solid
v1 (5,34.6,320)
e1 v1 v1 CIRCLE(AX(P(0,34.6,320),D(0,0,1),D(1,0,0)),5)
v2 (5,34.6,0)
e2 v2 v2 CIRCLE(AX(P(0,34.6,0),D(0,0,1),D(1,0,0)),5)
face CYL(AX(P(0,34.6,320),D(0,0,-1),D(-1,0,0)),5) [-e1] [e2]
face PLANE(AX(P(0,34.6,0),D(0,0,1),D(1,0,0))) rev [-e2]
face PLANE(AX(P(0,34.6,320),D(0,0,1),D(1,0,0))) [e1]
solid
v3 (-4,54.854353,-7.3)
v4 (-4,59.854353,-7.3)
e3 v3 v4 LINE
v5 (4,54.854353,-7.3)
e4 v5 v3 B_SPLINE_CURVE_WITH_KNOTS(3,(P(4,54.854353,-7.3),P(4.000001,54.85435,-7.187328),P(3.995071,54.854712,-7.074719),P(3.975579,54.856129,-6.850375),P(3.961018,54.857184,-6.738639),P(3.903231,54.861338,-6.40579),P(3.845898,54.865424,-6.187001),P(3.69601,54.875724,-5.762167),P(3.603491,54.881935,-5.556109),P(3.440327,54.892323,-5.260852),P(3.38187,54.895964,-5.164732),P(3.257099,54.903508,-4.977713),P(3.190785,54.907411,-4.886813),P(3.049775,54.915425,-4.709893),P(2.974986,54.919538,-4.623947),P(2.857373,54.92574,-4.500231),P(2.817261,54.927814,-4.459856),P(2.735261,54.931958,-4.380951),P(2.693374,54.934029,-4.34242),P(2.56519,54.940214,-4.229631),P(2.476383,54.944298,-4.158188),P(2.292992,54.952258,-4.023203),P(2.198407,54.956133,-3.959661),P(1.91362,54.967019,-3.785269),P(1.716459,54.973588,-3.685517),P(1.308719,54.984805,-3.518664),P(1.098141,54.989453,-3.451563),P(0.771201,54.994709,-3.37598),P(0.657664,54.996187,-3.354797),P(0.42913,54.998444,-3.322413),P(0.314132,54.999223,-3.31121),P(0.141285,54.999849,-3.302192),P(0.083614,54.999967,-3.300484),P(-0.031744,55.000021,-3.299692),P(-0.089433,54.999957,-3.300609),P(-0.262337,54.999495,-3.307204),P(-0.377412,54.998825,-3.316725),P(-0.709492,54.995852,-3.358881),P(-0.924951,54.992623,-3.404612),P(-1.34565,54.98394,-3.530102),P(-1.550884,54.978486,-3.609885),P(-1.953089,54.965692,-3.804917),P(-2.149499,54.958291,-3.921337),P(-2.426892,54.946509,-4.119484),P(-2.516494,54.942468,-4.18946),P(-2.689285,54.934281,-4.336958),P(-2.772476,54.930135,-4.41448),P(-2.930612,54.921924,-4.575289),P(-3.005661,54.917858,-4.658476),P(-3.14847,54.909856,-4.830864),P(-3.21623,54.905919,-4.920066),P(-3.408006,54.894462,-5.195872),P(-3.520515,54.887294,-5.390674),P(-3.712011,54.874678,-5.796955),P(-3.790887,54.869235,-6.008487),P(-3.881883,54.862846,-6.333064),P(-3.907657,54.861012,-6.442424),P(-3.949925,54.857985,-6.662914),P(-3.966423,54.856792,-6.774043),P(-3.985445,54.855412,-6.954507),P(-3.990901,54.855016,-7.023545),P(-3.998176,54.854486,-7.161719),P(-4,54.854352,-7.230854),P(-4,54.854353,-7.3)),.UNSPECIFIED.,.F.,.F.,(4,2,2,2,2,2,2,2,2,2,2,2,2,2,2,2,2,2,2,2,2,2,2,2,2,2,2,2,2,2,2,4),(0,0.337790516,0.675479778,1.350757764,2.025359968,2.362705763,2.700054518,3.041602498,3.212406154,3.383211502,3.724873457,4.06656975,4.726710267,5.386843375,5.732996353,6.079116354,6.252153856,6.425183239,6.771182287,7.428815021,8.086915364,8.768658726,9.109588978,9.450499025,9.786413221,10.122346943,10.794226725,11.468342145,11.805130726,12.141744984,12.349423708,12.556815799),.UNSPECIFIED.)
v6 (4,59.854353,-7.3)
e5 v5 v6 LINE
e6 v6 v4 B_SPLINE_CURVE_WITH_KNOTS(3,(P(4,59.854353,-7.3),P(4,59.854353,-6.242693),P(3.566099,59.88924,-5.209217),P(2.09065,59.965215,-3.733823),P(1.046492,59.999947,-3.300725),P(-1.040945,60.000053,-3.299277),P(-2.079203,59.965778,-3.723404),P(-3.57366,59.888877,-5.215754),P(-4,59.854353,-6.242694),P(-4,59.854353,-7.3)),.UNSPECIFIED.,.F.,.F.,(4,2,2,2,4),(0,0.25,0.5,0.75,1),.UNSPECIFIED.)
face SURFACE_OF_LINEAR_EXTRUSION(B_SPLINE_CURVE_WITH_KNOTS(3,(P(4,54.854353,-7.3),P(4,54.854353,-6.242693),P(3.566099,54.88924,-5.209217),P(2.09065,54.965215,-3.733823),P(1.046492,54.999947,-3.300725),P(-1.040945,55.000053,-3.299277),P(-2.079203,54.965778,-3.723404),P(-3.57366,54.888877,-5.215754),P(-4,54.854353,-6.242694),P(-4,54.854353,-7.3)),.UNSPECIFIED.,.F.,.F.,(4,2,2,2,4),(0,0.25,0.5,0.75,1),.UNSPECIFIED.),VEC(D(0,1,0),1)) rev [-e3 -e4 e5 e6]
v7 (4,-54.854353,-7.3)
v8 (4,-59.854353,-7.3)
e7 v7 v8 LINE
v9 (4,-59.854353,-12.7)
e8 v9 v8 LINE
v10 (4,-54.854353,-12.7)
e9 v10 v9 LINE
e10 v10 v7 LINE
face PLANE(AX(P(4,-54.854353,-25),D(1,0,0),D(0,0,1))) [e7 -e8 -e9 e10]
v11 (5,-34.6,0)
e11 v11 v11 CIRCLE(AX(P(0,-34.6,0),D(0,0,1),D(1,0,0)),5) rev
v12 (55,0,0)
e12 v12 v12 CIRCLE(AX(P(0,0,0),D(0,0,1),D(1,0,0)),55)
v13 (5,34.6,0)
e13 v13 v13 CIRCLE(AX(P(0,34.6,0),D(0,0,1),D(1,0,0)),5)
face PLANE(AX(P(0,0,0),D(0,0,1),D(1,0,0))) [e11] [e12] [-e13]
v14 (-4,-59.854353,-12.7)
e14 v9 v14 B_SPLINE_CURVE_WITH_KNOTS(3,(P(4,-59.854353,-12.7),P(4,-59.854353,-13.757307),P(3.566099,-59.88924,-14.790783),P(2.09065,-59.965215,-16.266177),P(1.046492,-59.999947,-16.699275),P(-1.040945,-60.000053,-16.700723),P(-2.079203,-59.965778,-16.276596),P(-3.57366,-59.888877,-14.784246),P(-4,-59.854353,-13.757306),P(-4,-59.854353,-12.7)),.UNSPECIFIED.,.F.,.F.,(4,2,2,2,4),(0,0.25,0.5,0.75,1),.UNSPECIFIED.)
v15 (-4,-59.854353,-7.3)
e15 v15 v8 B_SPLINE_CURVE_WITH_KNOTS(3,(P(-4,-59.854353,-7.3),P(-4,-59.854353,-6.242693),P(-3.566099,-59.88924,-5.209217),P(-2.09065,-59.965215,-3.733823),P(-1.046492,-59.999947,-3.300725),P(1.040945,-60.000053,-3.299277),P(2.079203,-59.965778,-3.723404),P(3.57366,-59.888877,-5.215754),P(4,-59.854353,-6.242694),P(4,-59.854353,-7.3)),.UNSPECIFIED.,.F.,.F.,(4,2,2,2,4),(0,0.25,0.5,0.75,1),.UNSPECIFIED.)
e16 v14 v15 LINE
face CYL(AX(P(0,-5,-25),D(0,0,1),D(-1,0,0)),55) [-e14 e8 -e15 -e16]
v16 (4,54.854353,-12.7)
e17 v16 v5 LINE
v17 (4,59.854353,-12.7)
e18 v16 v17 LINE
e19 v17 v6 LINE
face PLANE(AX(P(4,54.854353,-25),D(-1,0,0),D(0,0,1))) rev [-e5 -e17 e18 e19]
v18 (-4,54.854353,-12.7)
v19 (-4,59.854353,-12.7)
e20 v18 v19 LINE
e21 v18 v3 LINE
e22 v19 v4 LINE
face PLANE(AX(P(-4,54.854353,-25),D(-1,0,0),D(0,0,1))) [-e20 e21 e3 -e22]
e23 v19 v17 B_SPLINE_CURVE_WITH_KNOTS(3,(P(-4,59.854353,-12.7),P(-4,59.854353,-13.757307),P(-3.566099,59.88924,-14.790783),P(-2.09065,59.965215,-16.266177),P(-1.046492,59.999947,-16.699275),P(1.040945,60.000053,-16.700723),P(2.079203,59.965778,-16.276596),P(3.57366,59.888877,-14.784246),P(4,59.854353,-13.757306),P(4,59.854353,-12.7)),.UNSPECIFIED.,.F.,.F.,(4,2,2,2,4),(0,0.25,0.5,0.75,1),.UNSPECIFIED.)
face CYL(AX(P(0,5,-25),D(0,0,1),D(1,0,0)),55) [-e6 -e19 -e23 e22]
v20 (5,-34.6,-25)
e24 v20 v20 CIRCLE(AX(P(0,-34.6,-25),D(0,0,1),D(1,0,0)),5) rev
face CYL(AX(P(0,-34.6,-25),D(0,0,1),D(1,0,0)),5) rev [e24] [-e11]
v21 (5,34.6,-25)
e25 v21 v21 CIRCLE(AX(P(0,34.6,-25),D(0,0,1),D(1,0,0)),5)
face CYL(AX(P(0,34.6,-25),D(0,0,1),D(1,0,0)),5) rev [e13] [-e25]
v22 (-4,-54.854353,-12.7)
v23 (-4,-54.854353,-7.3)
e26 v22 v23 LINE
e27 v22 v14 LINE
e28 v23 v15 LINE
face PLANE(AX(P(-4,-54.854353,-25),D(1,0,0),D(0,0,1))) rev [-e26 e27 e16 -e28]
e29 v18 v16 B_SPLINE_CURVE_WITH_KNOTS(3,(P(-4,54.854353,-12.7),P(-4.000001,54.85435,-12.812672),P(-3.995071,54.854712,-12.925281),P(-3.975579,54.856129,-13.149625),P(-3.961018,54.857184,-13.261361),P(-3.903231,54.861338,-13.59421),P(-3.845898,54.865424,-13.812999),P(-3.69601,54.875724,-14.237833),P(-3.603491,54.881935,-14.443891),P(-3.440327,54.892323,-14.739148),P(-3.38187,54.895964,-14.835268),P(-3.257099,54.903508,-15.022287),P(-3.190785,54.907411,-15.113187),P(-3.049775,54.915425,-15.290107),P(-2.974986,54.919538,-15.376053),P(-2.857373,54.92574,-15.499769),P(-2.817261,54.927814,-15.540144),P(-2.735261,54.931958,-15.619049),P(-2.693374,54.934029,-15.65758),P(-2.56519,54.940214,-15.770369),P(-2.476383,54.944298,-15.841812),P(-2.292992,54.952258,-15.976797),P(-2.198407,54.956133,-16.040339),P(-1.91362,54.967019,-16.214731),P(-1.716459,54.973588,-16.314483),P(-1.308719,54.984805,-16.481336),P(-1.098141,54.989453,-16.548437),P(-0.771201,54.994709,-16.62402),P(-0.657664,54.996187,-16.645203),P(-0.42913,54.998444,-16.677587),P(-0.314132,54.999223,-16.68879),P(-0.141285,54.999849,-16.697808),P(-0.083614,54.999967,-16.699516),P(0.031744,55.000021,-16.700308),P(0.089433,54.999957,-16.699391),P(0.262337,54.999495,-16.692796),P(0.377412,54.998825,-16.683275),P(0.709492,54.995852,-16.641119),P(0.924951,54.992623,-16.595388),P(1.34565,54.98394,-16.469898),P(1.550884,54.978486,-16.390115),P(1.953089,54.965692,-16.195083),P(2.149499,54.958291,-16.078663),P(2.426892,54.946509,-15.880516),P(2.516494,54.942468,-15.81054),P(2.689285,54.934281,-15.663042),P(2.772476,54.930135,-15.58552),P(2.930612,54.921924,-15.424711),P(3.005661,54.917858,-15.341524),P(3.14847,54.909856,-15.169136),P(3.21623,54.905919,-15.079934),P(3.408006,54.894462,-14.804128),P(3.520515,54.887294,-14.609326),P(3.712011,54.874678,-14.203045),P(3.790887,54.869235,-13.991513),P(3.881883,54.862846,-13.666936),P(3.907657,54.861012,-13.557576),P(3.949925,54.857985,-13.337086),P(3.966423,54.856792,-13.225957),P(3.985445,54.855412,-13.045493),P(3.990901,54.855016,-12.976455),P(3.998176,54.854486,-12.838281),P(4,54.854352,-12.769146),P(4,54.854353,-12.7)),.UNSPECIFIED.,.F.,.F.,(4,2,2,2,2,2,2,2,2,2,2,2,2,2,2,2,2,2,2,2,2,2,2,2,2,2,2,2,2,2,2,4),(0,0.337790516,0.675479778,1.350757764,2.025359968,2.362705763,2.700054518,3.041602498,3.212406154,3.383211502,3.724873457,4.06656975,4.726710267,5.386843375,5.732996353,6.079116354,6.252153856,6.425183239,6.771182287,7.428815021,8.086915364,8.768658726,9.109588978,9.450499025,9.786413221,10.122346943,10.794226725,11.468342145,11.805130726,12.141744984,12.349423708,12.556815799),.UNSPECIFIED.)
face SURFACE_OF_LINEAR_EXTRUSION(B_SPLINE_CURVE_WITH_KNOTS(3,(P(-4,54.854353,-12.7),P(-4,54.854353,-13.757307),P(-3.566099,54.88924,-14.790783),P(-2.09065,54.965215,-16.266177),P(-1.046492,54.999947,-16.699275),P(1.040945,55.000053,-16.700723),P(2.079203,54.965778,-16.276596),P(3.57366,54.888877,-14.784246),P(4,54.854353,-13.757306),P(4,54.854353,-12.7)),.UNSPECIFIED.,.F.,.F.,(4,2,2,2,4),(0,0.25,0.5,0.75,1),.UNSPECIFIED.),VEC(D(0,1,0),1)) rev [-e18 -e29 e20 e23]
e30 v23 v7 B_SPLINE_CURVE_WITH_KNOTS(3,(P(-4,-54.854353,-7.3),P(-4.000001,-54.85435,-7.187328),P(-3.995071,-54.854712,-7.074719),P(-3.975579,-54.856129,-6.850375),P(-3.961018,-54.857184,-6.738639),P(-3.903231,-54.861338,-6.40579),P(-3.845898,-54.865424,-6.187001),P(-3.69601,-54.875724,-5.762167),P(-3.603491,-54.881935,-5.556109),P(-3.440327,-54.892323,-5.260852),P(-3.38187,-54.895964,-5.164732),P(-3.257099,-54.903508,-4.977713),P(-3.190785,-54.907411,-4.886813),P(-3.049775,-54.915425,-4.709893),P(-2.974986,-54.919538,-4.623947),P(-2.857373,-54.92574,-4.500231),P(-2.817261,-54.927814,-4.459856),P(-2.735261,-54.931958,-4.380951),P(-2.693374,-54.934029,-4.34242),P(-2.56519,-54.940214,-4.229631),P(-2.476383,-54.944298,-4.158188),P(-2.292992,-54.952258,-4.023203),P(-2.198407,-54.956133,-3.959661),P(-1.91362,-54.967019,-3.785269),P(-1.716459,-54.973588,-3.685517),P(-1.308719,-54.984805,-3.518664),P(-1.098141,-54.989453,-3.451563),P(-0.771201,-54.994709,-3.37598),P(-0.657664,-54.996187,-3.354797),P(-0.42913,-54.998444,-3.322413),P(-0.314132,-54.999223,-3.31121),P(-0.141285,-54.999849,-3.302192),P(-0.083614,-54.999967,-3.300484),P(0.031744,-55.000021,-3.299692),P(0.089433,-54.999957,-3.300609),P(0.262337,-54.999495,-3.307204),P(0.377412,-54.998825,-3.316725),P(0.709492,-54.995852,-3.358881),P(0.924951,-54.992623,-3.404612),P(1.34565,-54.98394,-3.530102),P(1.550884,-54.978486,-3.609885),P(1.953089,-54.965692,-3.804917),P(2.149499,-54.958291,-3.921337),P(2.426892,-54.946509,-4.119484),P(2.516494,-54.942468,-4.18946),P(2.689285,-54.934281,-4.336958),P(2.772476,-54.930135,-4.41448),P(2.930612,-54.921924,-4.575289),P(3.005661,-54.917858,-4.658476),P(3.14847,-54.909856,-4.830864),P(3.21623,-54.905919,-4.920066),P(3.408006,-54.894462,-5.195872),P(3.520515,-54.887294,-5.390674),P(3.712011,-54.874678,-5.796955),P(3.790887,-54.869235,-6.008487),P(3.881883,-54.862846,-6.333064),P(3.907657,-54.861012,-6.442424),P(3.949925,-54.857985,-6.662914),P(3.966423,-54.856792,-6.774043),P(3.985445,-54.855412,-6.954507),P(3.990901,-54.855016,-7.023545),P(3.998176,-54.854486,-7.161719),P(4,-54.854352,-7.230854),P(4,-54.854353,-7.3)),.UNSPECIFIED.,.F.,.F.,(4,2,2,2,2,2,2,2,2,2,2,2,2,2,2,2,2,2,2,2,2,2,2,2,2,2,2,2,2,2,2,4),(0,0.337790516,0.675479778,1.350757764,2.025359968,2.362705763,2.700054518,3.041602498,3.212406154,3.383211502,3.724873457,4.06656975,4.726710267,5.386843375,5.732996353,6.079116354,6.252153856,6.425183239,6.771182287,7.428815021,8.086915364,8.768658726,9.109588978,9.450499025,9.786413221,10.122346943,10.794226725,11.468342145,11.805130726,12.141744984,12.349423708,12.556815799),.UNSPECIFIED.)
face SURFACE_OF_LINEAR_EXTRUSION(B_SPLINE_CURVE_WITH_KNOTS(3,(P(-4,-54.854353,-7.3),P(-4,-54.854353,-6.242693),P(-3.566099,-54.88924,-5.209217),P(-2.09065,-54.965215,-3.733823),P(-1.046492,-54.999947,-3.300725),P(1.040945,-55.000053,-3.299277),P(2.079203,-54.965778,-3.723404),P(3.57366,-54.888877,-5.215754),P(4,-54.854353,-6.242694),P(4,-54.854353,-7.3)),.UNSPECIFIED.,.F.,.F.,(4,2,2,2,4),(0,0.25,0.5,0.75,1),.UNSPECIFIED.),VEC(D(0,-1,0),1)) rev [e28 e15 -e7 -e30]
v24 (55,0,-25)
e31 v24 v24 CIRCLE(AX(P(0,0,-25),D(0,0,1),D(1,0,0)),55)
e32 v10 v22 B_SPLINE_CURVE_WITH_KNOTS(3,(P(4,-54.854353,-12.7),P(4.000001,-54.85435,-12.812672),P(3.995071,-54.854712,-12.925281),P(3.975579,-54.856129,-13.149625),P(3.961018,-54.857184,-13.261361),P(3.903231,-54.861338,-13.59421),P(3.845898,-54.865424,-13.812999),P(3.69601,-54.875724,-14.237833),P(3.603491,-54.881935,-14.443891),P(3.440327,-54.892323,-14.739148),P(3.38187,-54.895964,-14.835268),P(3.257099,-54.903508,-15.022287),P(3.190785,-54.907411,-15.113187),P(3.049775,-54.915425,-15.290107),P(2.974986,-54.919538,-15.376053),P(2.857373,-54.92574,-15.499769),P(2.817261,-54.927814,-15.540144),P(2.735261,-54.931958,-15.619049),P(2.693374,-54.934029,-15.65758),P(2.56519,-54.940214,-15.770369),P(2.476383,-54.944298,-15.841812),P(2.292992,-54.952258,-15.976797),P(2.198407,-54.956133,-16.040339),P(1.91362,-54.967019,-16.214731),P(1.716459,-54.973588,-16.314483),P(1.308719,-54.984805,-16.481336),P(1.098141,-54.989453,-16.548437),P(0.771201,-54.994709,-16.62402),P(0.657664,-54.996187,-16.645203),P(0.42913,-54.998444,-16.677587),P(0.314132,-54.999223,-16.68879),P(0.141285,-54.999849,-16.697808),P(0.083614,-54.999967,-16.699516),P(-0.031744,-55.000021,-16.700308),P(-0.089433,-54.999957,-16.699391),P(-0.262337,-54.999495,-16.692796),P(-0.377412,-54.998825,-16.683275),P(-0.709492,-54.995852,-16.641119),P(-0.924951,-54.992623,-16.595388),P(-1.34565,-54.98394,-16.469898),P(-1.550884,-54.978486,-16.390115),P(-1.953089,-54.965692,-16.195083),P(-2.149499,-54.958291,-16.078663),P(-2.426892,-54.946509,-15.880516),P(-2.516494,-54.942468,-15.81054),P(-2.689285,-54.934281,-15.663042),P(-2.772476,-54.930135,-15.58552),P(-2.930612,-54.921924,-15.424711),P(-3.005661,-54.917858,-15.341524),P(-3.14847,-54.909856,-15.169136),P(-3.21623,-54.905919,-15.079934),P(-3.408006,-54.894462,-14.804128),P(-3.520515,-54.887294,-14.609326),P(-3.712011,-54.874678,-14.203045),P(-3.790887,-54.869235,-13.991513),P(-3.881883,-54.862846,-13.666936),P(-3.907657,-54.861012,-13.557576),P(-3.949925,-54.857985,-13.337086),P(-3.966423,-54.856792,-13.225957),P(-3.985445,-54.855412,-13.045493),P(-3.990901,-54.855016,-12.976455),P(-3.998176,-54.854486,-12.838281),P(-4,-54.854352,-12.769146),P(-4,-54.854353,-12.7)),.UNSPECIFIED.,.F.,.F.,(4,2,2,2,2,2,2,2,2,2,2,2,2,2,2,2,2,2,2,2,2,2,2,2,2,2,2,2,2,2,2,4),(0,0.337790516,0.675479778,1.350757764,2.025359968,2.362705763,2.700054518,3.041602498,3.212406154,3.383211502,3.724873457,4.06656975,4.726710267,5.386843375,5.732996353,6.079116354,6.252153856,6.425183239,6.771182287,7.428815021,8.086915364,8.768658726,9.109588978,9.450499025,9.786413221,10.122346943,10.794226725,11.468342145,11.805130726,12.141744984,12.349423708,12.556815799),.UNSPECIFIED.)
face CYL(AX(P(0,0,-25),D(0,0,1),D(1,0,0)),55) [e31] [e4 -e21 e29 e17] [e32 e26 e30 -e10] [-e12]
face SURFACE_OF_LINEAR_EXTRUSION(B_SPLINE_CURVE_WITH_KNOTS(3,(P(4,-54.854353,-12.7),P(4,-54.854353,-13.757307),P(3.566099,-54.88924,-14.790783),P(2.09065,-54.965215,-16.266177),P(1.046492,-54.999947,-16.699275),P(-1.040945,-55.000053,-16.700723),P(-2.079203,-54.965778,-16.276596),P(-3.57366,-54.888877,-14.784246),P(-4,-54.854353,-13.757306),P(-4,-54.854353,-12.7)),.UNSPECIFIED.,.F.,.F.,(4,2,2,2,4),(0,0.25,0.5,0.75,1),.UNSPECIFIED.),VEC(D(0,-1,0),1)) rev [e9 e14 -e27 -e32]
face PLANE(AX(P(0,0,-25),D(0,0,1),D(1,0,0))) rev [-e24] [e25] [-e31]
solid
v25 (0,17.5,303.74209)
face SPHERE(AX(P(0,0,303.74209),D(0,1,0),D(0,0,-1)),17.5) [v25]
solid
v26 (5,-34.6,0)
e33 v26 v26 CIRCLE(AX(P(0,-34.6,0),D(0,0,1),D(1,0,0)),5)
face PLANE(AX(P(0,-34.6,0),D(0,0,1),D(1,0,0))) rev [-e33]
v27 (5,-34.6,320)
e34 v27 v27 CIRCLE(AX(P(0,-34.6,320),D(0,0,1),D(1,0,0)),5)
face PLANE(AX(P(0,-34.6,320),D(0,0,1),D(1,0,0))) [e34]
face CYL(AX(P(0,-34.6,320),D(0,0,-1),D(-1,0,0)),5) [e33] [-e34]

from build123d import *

# Parameters (mm, degrees)
SKETCH2_R             = 55
SKETCH2_R_2           = 5
BOSS_EXTRUDE1_DEPTH   = 25
SKETCH3_R             = 5
BOSS_EXTRUDE2_DEPTH   = 320
BOSS_EXTRUDE2_2_DEPTH = 320
BOSS_EXTRUDE3_START   = 54
BOSS_EXTRUDE3_DEPTH   = 6.000000091
BOSS_EXTRUDE3_START_2 = -18
BOSS_EXTRUDE3_2_DEPTH = 16
CIRPATTERN1_COUNT     = 2


with BuildPart() as part:
    # Sketch2 → Boss-Extrude1 (new body)
    with BuildSketch(Plane.XY):
        Circle(SKETCH2_R)
        with Locations((0, 34.6)):
            Circle(SKETCH2_R_2, mode=Mode.SUBTRACT)
        with Locations((0, -34.6)):
            Circle(SKETCH2_R_2, mode=Mode.SUBTRACT)
    extrude(amount=-BOSS_EXTRUDE1_DEPTH)

    # Boss-Extrude3: read off the stored shape, not the designer's step
    # Boss-Extrude3 outline → Boss-Extrude3 (add)
    with BuildSketch(Plane(origin=(0, 0, 0), x_dir=(1, 0, 0), z_dir=(0, 1, 0)).offset(BOSS_EXTRUDE3_START)):
        with BuildLine():
            add(Edge.make_bspline(
                [(-4, 12.7), (-4, 13.757306955), (-3.566098709, 14.790783091), (-2.090649903, 16.266176794), (-1.046492028, 16.699275324), (1.040944828, 16.700722753), (2.079203486, 16.276596211), (3.573660151, 14.784245838), (4, 13.757305644), (4, 12.7)],
                knots=[0, 0, 0, 0, 0.25, 0.25, 0.5, 0.5, 0.75, 0.75, 1, 1, 1, 1], degree=3))
            Line((-4, 12.7), (-4, 7.3))
            add(Edge.make_bspline(
                [(4, 7.3), (4, 6.242693045), (3.566098709, 5.209216909), (2.090649903, 3.733823206), (1.046492028, 3.300724676), (-1.040944828, 3.299277247), (-2.079203486, 3.723403789), (-3.573660151, 5.215754162), (-4, 6.242694356), (-4, 7.3)],
                knots=[0, 0, 0, 0, 0.25, 0.25, 0.5, 0.5, 0.75, 0.75, 1, 1, 1, 1], degree=3))
            Line((4, 7.3), (4, 12.7))
        make_face()
    boss_extrude3 = extrude(amount=BOSS_EXTRUDE3_DEPTH)

    # Boss-Extrude3 2 outline → Boss-Extrude3 2 (cut)
    with BuildSketch(Plane.XY.offset(BOSS_EXTRUDE3_START_2)):
        with BuildLine():
            ThreePointArc((-4, 59.854352608), (-2.001325119, 59.963576101), (5.3e-07, 60))
            Line((5.3e-07, 60), (-4, 60.000000091))
            Line((-4, 60.000000091), (-4, 59.854352608))
        make_face()
        with BuildLine():
            ThreePointArc((5.3e-07, 60), (2.001325648, 59.963576081), (4, 59.854352608))
            Line((4, 59.854352608), (4, 60.000000091))
            Line((4, 60.000000091), (5.3e-07, 60))
        make_face()
    boss_extrude3_2 = extrude(amount=BOSS_EXTRUDE3_2_DEPTH, mode=Mode.SUBTRACT)

    # CirPattern1: Boss-Extrude3, Boss-Extrude3 2 ×2 about axis
    cirpattern1_axis = Axis((0, 0, 0), (0, 0, 1))
    add([boss_extrude3.rotate(cirpattern1_axis, i * 360 / CIRPATTERN1_COUNT) for i in range(1, CIRPATTERN1_COUNT)])
    add([boss_extrude3_2.rotate(cirpattern1_axis, i * 360 / CIRPATTERN1_COUNT) for i in range(1, CIRPATTERN1_COUNT)], mode=Mode.SUBTRACT)


with BuildPart() as body_2:
    # Sketch3 → Boss-Extrude2 (new body)
    with BuildSketch(Plane.XY):
        with Locations((0, -34.6)):
            Circle(SKETCH3_R)
    extrude(amount=BOSS_EXTRUDE2_DEPTH)


with BuildPart() as body_3:
    # Sketch3 → Boss-Extrude2 2 (new body)
    with BuildSketch(Plane.XY):
        with Locations((0, 34.6)):
            Circle(SKETCH3_R)
    extrude(amount=BOSS_EXTRUDE2_2_DEPTH)


with BuildPart() as body_4:
    # Sketch5 → Revolve1 (revolve)
    with BuildSketch(Plane(origin=(0, 0, 0), x_dir=(0, 0, -1), z_dir=(1, 0, 0))):
        with BuildLine():
            Line((-303.742089953, 17.5), (-303.742089953, -17.5))
            ThreePointArc((-303.742089953, -17.5), (-286.242089953, 0), (-303.742089953, 17.5))
        make_face()
    revolve(axis=Axis((0, 17.5, 303.742089953), (0, -1, 0)))


solid = Compound([part.part, body_2.part, body_3.part, body_4.part])
